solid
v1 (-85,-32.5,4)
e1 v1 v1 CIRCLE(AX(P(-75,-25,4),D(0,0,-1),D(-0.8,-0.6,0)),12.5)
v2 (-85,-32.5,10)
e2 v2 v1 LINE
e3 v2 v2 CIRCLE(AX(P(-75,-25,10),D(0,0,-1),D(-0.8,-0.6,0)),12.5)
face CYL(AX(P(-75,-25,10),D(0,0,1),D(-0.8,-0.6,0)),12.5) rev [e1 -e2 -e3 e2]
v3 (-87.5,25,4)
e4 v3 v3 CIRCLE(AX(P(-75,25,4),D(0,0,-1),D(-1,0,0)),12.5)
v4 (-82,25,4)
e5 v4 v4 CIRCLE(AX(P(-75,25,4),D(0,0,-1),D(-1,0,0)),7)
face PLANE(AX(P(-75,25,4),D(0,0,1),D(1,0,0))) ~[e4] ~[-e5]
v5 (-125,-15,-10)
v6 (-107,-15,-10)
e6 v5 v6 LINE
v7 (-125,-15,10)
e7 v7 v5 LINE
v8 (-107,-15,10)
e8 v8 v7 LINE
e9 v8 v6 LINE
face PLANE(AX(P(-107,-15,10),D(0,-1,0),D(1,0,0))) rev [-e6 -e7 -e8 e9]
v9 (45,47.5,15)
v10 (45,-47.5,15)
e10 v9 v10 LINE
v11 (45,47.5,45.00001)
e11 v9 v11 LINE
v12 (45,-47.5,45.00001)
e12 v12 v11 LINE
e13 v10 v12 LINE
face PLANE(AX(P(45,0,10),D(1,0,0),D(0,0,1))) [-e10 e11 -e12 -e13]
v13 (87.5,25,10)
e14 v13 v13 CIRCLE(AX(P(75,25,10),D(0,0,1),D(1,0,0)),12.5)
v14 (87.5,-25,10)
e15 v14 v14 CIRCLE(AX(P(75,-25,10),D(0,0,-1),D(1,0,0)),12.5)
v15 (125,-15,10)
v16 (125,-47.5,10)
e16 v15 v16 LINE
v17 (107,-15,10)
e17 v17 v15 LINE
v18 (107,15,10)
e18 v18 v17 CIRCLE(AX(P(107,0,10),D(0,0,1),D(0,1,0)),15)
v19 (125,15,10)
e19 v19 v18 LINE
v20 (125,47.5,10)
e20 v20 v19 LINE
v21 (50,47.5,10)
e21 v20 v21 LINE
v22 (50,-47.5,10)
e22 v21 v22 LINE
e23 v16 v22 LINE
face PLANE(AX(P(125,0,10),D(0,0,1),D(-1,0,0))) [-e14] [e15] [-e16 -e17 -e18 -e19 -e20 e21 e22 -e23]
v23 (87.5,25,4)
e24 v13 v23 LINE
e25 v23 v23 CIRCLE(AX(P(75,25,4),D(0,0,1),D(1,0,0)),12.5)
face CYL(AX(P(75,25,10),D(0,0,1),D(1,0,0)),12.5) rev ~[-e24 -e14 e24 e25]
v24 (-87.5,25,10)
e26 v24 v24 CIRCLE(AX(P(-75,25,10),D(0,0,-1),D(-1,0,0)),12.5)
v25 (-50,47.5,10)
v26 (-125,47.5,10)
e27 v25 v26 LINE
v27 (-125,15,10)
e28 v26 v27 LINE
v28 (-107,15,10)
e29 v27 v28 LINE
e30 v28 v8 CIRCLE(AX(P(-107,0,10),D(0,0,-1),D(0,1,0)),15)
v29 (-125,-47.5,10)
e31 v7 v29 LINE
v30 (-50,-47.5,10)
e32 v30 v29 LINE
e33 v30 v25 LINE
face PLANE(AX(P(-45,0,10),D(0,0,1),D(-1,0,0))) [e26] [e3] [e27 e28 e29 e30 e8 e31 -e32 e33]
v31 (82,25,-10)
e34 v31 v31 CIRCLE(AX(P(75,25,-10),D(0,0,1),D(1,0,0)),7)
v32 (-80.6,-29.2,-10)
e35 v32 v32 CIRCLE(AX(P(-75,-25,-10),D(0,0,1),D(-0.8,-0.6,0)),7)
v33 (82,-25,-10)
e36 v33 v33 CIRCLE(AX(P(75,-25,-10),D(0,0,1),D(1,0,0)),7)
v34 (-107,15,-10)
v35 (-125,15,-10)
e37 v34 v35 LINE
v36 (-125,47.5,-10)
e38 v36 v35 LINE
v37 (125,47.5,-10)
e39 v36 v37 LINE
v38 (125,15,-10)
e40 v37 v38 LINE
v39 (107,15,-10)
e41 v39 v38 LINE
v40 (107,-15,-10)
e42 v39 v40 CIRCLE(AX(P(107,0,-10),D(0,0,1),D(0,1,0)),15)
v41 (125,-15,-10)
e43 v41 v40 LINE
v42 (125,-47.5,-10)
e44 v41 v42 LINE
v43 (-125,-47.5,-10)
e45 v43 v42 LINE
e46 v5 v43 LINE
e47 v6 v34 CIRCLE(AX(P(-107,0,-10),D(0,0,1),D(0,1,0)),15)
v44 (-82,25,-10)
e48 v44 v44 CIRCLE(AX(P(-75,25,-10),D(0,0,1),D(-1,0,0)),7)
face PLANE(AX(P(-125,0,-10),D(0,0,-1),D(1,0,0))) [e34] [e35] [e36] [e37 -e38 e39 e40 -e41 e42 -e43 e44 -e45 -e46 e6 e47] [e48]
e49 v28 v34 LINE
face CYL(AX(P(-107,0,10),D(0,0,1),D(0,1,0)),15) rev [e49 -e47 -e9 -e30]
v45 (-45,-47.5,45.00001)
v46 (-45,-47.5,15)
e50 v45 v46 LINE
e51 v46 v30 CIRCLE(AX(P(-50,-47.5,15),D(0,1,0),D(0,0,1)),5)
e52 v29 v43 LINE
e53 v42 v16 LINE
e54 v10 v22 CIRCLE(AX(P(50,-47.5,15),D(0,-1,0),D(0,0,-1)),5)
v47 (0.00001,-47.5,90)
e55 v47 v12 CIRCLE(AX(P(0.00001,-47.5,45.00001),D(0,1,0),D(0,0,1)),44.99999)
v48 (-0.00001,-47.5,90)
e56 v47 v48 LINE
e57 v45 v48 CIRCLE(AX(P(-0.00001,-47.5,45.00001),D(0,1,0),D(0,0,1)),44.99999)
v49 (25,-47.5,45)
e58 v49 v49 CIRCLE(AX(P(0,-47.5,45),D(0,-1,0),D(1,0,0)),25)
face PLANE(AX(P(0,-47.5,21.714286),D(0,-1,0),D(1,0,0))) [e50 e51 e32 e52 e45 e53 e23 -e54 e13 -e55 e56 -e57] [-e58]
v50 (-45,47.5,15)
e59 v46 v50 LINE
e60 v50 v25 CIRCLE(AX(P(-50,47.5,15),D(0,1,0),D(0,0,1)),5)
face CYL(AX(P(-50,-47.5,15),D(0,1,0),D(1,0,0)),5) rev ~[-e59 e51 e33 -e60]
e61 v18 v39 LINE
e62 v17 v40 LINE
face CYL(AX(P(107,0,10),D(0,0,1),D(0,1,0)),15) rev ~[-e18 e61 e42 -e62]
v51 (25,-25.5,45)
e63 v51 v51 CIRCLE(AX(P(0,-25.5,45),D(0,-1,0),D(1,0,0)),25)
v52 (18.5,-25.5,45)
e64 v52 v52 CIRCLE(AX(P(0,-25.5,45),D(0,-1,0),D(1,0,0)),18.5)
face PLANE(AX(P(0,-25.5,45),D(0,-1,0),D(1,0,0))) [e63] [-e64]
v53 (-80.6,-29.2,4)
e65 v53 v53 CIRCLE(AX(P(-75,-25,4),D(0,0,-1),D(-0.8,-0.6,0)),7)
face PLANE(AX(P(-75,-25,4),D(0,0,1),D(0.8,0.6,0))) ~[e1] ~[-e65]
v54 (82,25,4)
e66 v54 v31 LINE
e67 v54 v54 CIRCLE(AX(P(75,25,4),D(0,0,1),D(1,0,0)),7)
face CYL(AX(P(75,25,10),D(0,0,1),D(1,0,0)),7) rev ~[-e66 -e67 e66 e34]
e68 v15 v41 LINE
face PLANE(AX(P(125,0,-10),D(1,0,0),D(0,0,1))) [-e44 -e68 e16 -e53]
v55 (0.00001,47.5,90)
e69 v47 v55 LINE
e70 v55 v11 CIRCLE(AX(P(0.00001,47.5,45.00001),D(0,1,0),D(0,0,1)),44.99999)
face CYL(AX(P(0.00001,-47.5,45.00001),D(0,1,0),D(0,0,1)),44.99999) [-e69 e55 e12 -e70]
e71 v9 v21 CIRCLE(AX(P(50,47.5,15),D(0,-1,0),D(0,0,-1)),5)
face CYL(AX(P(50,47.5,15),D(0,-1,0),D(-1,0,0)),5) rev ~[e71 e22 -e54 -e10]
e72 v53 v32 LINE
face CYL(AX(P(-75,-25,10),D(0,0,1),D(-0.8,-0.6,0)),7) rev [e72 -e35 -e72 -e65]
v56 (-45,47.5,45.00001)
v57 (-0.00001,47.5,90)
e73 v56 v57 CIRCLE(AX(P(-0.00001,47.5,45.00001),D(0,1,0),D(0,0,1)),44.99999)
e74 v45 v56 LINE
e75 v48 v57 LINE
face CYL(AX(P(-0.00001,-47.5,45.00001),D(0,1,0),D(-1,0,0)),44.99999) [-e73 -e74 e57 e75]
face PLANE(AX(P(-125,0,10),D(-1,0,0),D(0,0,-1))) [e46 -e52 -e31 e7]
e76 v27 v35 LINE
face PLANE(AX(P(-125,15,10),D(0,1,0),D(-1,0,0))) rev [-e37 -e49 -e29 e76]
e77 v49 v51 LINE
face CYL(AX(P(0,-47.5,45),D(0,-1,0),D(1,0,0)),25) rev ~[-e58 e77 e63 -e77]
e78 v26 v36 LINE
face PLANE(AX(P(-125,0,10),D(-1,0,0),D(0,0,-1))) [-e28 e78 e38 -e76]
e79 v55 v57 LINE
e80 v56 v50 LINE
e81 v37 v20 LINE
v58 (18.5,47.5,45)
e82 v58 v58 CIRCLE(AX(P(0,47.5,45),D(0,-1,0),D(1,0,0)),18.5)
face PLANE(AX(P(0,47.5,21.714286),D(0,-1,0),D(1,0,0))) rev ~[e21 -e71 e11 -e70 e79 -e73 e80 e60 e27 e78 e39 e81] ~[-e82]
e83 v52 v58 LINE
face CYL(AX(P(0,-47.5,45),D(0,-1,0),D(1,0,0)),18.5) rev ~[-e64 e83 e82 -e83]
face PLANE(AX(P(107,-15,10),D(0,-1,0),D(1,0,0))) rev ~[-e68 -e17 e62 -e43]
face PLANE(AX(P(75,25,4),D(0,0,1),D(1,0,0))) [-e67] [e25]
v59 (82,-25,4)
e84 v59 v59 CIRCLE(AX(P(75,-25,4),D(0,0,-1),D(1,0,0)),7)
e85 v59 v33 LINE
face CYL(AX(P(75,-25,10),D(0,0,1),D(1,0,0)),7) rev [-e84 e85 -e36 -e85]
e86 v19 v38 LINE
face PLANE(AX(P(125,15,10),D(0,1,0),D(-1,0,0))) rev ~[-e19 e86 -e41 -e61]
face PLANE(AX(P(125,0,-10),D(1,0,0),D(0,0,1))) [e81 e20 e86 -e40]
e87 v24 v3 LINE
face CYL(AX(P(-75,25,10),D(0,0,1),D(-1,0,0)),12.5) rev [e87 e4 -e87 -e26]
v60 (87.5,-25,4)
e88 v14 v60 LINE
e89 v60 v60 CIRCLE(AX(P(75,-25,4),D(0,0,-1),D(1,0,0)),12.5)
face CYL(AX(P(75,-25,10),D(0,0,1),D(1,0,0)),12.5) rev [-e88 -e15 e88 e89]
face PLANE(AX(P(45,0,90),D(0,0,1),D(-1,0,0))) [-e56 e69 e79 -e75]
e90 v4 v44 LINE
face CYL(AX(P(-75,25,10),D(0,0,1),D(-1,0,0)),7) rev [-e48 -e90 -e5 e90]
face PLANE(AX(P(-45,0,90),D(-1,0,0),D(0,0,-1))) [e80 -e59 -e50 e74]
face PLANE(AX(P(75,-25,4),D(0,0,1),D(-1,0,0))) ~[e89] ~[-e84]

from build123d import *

# Parameters (mm, degrees)
F1_DEPTH  = 47.5
F2_R      = 44.99999
F3_R      = 5
F4_R      = 18.5
F5_DEPTH  = 95.001
F4_R_2    = 25
F6_DEPTH  = 22
F8_DEPTH  = 20.001
F7_R      = 12.5
F7_R_2    = 7
F9_DEPTH  = 6
F10_DEPTH = 20.001


# Not quite as in the source:
# - a fillet or chamfer is up to 0.001 mm smaller than in the source, because OpenCascade refuses the exact size
# - a pattern or mirror of a feature is missing from the dataset's text; its kind, count and spacing are read off the source's solid


with BuildPart() as f1:
    # F0 (on Front) → F1 (new body, symmetric)
    with BuildSketch(Plane.XZ):
        Polygon((-45, 10), (-125, 10), (-125, -10), (125, -10), (125, 10), (45, 10), (45, 90), (-45, 90), align=None)
    extrude(amount=F1_DEPTH, both=True)

    # F2 (radius 45 in the source; OpenCascade refuses exactly that, so slightly less here)
    f2_edges = [f1.edges().sort_by_distance(p)[0] for p in [
        (45, 0, 90),
        (-45, 0, 90),
    ]]
    fillet(f2_edges, radius=F2_R)

    # F3
    f3_edges = [f1.edges().sort_by_distance(p)[0] for p in [
        (45, 0, 10),
        (-45, 0, 10),
    ]]
    fillet(f3_edges, radius=F3_R)

    # F4 (on face) → F5 (cut, through all)
    with BuildSketch(Plane.XZ.offset(47.5)):
        with Locations((0, 45)):
            Circle(F4_R)
    extrude(amount=-F5_DEPTH, mode=Mode.SUBTRACT)

    # F4 (on face) → F6 (cut)
    with BuildSketch(Plane.XZ.offset(47.5)):
        with Locations((0, 45)):
            Circle(F4_R_2)
        with Locations((0, 45)):
            Circle(F4_R, mode=Mode.SUBTRACT)
    extrude(amount=-F6_DEPTH, mode=Mode.SUBTRACT)

    # F7 (on face) → F8 (cut, through all)
    with BuildSketch(Plane.XY.offset(10)):
        with BuildLine():
            Line((125, -15), (125, 15))
            Line((125, 15), (107, 15))
            ThreePointArc((107, 15), (92, 0), (107, -15))
            Line((107, -15), (125, -15))
        make_face()
    f8 = extrude(amount=-F8_DEPTH, mode=Mode.SUBTRACT)

    # F8_copies: F8 across plane
    add(f8.mirror(Plane(origin=(0, 0, 0), x_dir=(0, 0, -1), z_dir=(-1, 0, 0))), mode=Mode.SUBTRACT)

    # F7 (on face) → F9 (cut)
    with BuildSketch(Plane.XY.offset(10)):
        with Locations((75, 25)):
            Circle(F7_R)
        with Locations((75, 25)):
            Circle(F7_R_2, mode=Mode.SUBTRACT)
    f9 = extrude(amount=-F9_DEPTH, mode=Mode.SUBTRACT)

    # F9_copies: F9 across plane
    add(f9.mirror(Plane(origin=(0, 0, 0), x_dir=(0, 0, -1), z_dir=(-1, 0, 0))), mode=Mode.SUBTRACT)

    # F9_copies1: F9 across plane
    add(f9.mirror(Plane(origin=(0, 0, 0), x_dir=(0, 0, -1), z_dir=(0, -1, 0))), mode=Mode.SUBTRACT)

    # F9_copies2: F9 across plane
    add(f9.mirror(Plane(origin=(0, 0, 0), x_dir=(0.316227766, -0.9486832981, 0), z_dir=(-0.9486832981, -0.316227766, 0))), mode=Mode.SUBTRACT)

    # F7 (on face) → F10 (cut, through all)
    with BuildSketch(Plane.XY.offset(10)):
        with Locations((75, 25)):
            Circle(F7_R_2)
    f10 = extrude(amount=-F10_DEPTH, mode=Mode.SUBTRACT)

    # F10_copies: F10 across plane
    add(f10.mirror(Plane(origin=(0, 0, 0), x_dir=(0, 0, -1), z_dir=(0, -1, 0))), mode=Mode.SUBTRACT)

    # F10_copies1: F10 across plane
    add(f10.mirror(Plane(origin=(0, 0, 0), x_dir=(0, 0, -1), z_dir=(-1, 0, 0))), mode=Mode.SUBTRACT)

    # F10_copies2: F10 across plane
    add(f10.mirror(Plane(origin=(0, 0, 0), x_dir=(0.316227766, -0.9486832981, 0), z_dir=(-0.9486832981, -0.316227766, 0))), mode=Mode.SUBTRACT)


solid = f1.part
